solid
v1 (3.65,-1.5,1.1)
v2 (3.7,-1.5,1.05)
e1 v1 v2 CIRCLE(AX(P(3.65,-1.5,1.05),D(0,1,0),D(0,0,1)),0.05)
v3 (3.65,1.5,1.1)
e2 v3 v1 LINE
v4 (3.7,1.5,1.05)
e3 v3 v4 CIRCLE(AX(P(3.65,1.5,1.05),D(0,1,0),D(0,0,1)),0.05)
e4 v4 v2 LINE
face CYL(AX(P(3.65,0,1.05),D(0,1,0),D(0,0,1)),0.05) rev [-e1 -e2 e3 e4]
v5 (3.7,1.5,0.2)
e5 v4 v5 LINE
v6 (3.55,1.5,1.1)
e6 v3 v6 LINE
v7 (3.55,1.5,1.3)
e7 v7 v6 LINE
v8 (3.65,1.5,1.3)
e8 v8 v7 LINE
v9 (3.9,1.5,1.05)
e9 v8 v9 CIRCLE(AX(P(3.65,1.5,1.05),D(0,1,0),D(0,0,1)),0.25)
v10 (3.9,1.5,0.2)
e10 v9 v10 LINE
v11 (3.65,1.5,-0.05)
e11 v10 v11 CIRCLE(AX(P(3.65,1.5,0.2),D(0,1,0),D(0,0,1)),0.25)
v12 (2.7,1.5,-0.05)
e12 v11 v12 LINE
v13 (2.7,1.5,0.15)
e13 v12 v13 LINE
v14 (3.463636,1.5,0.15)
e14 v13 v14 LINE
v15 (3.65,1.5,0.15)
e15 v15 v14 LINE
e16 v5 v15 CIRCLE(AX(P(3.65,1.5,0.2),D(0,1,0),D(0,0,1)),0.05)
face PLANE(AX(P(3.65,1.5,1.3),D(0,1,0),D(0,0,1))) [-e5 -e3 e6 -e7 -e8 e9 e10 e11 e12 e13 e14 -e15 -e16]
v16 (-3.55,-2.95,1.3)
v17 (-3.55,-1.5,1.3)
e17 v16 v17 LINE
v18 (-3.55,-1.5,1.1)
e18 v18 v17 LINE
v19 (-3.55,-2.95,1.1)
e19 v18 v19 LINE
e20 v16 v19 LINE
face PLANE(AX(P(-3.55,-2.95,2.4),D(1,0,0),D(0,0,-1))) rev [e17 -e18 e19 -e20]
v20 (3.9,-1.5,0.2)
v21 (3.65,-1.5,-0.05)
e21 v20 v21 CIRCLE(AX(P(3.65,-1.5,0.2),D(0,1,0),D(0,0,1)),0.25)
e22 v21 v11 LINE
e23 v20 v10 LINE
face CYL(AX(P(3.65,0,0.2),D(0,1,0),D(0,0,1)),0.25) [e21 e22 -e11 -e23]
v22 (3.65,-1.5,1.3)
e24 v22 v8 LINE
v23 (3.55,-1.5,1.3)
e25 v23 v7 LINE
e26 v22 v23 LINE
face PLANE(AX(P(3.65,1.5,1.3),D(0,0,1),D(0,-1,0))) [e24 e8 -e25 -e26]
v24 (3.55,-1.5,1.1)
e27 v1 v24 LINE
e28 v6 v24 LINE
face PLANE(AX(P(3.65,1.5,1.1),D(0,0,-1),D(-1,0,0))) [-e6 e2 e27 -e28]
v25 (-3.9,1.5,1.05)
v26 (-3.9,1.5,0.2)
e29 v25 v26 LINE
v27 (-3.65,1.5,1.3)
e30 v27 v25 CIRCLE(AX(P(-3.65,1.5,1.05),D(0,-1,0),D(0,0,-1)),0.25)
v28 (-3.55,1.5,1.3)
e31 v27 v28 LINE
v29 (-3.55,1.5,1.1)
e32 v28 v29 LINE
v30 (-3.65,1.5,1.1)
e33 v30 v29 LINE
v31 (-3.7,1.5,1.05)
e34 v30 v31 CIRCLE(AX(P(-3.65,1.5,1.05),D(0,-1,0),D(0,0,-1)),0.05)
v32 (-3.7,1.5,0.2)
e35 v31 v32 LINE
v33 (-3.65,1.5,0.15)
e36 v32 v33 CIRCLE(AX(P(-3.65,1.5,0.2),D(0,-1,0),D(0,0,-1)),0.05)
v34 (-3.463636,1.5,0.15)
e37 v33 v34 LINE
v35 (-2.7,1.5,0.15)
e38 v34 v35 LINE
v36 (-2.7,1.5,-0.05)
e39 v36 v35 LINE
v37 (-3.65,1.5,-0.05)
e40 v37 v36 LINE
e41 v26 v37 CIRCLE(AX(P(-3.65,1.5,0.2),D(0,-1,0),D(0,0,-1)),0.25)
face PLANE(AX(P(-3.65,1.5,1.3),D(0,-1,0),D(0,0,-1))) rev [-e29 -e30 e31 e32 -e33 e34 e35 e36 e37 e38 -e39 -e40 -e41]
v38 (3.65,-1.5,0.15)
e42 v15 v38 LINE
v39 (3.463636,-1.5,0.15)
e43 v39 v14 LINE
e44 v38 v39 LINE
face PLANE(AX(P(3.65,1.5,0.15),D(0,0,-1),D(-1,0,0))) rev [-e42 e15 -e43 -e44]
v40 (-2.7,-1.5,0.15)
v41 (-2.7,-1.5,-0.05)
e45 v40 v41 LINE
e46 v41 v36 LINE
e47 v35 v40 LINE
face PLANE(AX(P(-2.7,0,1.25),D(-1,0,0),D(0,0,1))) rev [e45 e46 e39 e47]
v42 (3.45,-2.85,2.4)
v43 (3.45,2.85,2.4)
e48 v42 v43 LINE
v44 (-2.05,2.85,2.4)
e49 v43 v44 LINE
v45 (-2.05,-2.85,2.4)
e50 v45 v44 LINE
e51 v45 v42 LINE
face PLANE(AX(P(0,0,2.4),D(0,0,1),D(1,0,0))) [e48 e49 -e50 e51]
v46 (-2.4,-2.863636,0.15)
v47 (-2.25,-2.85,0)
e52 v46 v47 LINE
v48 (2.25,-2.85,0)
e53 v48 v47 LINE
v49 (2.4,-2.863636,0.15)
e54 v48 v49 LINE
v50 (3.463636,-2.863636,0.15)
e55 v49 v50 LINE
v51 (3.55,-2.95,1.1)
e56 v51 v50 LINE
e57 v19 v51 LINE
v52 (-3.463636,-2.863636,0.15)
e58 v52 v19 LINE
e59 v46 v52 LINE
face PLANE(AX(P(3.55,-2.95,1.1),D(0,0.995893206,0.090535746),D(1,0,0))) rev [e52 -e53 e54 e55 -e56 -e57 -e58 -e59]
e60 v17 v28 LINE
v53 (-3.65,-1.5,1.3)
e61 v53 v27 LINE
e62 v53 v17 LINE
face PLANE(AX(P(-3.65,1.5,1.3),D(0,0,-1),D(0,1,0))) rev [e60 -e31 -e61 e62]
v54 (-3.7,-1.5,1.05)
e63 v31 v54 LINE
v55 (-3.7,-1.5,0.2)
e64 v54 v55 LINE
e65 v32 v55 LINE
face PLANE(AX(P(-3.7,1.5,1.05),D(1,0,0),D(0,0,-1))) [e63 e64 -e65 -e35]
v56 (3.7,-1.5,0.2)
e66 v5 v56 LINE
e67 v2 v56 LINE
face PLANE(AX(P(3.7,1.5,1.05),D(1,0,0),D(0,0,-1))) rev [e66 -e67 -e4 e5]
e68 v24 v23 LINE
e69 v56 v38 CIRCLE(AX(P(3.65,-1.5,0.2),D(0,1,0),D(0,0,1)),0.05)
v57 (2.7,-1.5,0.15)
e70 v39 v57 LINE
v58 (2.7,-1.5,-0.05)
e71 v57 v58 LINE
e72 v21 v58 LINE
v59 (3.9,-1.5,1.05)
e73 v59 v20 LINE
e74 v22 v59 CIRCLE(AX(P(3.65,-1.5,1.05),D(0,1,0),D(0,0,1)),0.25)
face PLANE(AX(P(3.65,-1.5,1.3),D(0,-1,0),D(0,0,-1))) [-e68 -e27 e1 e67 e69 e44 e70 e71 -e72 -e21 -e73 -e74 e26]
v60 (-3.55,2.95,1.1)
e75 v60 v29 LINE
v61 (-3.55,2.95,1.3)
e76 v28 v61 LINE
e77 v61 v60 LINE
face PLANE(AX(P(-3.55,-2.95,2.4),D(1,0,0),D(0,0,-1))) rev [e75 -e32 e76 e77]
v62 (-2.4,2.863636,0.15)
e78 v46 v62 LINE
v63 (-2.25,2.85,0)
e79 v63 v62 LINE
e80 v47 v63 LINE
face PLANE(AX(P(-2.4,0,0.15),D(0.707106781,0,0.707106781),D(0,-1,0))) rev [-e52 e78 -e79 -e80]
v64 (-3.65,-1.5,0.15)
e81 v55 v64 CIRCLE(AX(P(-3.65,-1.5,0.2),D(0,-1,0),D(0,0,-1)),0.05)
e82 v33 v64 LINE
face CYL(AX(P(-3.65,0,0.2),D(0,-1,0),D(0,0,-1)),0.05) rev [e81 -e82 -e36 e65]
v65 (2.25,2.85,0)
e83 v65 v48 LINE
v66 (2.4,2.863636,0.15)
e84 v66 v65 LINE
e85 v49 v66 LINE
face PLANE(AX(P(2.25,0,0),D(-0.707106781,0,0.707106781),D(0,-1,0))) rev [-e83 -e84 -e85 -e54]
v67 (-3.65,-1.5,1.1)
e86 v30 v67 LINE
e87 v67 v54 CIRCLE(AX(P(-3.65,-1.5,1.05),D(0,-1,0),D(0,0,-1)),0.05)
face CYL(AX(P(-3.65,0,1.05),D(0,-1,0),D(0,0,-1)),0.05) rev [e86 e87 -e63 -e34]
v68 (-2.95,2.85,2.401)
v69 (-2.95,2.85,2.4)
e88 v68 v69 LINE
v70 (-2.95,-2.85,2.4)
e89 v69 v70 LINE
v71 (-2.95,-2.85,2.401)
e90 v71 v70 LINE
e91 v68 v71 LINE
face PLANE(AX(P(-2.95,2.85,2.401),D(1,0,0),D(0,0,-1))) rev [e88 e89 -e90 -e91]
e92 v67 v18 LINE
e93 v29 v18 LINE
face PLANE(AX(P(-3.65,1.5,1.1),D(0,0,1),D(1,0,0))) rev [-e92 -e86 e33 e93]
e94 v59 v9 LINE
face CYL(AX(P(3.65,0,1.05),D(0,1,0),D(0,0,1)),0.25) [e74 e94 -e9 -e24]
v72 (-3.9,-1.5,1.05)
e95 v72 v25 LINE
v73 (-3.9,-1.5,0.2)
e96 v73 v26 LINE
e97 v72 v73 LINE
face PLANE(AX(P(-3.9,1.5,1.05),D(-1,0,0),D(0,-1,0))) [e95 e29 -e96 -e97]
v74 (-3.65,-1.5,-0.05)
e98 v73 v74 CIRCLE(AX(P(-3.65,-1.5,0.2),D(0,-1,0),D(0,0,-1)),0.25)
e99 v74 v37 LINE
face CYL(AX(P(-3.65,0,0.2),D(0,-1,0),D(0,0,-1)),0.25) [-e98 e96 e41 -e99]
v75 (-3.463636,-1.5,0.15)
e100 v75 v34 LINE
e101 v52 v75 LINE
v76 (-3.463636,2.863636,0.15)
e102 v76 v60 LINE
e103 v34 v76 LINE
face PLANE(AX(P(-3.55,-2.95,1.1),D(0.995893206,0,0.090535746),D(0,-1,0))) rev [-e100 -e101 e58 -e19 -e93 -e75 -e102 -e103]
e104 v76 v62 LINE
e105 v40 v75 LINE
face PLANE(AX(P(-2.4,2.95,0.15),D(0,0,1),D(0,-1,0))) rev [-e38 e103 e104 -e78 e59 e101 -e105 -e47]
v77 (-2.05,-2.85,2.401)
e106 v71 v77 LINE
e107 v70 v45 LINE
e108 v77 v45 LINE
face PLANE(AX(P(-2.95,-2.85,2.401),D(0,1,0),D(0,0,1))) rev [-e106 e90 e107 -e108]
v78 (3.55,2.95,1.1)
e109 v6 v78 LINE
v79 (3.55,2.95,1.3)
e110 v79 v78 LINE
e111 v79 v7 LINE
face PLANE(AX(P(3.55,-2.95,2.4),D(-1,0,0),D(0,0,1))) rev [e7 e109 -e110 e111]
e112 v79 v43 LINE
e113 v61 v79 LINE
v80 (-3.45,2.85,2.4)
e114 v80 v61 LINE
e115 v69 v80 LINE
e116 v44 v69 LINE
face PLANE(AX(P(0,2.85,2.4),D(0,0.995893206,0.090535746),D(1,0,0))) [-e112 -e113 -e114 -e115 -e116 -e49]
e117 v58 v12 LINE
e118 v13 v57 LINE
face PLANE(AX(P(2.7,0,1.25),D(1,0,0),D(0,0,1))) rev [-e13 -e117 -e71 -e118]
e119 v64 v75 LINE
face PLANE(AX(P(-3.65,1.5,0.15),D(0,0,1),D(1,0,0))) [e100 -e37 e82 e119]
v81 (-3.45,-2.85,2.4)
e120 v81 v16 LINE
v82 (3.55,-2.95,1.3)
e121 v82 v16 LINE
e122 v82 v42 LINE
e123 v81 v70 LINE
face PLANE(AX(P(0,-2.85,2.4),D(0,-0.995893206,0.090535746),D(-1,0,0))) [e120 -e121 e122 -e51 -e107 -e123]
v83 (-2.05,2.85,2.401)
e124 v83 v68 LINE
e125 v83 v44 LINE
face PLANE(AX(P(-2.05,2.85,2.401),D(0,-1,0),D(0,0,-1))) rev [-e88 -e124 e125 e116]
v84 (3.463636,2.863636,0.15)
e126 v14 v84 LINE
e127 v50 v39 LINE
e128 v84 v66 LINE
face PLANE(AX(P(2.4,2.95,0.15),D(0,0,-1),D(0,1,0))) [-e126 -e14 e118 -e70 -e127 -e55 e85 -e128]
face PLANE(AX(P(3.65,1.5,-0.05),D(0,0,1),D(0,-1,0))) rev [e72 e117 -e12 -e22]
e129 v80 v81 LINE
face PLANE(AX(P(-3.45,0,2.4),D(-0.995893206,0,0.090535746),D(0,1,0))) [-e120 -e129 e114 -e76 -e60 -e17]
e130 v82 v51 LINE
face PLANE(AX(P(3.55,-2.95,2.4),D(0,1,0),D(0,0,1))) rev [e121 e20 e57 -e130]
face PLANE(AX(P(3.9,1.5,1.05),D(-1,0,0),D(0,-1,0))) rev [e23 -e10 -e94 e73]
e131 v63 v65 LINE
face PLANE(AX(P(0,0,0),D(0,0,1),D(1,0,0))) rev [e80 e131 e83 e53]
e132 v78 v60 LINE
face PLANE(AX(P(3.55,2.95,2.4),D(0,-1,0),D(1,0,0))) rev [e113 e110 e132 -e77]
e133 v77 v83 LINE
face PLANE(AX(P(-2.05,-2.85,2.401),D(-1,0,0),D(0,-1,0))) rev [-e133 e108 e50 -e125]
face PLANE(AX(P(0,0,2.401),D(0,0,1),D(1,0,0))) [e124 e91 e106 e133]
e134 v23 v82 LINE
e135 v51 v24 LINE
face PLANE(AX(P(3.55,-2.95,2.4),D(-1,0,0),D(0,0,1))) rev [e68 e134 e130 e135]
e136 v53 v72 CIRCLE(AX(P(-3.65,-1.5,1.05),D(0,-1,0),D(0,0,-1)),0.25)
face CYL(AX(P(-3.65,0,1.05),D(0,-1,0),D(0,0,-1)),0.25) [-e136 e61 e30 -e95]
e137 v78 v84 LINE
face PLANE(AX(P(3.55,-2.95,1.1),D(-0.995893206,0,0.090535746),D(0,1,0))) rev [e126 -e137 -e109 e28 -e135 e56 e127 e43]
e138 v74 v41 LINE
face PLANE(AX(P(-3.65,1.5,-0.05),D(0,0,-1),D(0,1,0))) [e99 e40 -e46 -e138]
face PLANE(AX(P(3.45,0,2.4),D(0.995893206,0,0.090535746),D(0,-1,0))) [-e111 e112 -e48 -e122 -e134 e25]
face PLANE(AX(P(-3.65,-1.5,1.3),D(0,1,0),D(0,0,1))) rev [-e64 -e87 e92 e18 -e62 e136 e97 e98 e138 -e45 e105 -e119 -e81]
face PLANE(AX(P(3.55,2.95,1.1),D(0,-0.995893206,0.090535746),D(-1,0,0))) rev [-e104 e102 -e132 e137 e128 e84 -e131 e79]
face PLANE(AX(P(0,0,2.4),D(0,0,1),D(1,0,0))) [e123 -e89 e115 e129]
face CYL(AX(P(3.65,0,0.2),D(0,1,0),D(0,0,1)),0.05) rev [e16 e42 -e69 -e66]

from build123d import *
from OCP.BRepFilletAPI import BRepFilletAPI_MakeChamfer

# Parameters (mm, degrees)
SZKIC1_W                    = 7.1
SZKIC1_H                    = 5.9
DODANIE_WYCI_GNI_CIE1_DEPTH = 2.4
SFAZOWANIE1_SIZE            = 1.1
SFAZOWANIE1_SIZE2           = 0.1
SFAZOWANIE2_SIZE            = 0.1
SFAZOWANIE2_SIZE2           = 1.1
SZKIC2_W                    = 0.9
SZKIC2_H                    = 5.7
DODANIE_WYCI_GNI_CIE2_DEPTH = 0.001
SZKIC3_W                    = 0.15
SZKIC3_H                    = 5.9
WYTNIJ_WYCI_GNI_CIE1_DEPTH  = 1.15
SFAZOWANIE3_SIZE            = 0.15
SZKIC4_W                    = 0.2
SZKIC4_H                    = 3
SFAZOWANIE3_OF_LUSTRO1_SIZE = 0.15


with BuildPart() as part:
    # Szkic1 → Dodanie-wyciągnięcie1 (new body)
    with BuildSketch(Plane.XY):
        Rectangle(SZKIC1_W, SZKIC1_H)
    extrude(amount=DODANIE_WYCI_GNI_CIE1_DEPTH)

    # Sfazowanie1: one chamfer whose edges measure the first distance from different faces: ONE call of the kernel's chamfer builder (chamfer() names one face for all edges)
    sfazowanie1_edges_1 = [part.edges().sort_by_distance(p)[0] for p in [
        (3.55, 0, 2.4),
    ]]
    sfazowanie1_side_1 = [part.faces().sort_by_distance(p)[0] for p in [
        (3.55, 0, 1.2),
    ]]
    sfazowanie1_edges_2 = [part.edges().sort_by_distance(p)[0] for p in [
        (0, 2.95, 2.4),
    ]]
    sfazowanie1_side_2 = [part.faces().sort_by_distance(p)[0] for p in [
        (0, 2.95, 1.2),
    ]]
    sfazowanie1_edges_3 = [part.edges().sort_by_distance(p)[0] for p in [
        (-3.55, 0, 2.4),
    ]]
    sfazowanie1_side_3 = [part.faces().sort_by_distance(p)[0] for p in [
        (-3.55, 0, 1.2),
    ]]
    sfazowanie1_edges_4 = [part.edges().sort_by_distance(p)[0] for p in [
        (0, -2.95, 2.4),
    ]]
    sfazowanie1_side_4 = [part.faces().sort_by_distance(p)[0] for p in [
        (0, -2.95, 1.2),
    ]]
    sfazowanie1 = BRepFilletAPI_MakeChamfer(part.part.solid().wrapped)
    for e in sfazowanie1_edges_1:
        sfazowanie1.Add(SFAZOWANIE1_SIZE, SFAZOWANIE1_SIZE2, e.wrapped, sfazowanie1_side_1[0].wrapped)  # the first distance lies on this face
    for e in sfazowanie1_edges_2:
        sfazowanie1.Add(SFAZOWANIE1_SIZE, SFAZOWANIE1_SIZE2, e.wrapped, sfazowanie1_side_2[0].wrapped)  # the first distance lies on this face
    for e in sfazowanie1_edges_3:
        sfazowanie1.Add(SFAZOWANIE1_SIZE, SFAZOWANIE1_SIZE2, e.wrapped, sfazowanie1_side_3[0].wrapped)  # the first distance lies on this face
    for e in sfazowanie1_edges_4:
        sfazowanie1.Add(SFAZOWANIE1_SIZE, SFAZOWANIE1_SIZE2, e.wrapped, sfazowanie1_side_4[0].wrapped)  # the first distance lies on this face
    add(Compound.cast(sfazowanie1.Shape()), mode=Mode.REPLACE)

    # Sfazowanie2
    sfazowanie2_edges = [part.edges().sort_by_distance(p)[0] for p in [
        (0, 2.95, 0),
        (3.55, 0, 0),
        (0, -2.95, 0),
        (-3.55, 0, 0),
    ]]
    sfazowanie2_side = [part.faces().sort_by_distance(p)[0] for p in [
        (0, 0, 0),
    ]]
    chamfer(sfazowanie2_edges, length=SFAZOWANIE2_SIZE, length2=SFAZOWANIE2_SIZE2, reference=sfazowanie2_side[0])

    # Szkic2 → Dodanie-wyciągnięcie2 (add)
    with BuildSketch(Plane.XY.offset(2.4)):
        with Locations((-2.5, 0)):
            Rectangle(SZKIC2_W, SZKIC2_H)
    extrude(amount=DODANIE_WYCI_GNI_CIE2_DEPTH)

    # Szkic3 → Wytnij-wyciągnięcie1 (cut)
    with BuildSketch(Plane.ZY.offset(3.55)):
        with Locations((0.075, 0)):
            Rectangle(SZKIC3_W, SZKIC3_H)
    wytnij_wyci_gni_cie1 = extrude(amount=-WYTNIJ_WYCI_GNI_CIE1_DEPTH, mode=Mode.SUBTRACT)

    # Sfazowanie3
    sfazowanie3_edges = [part.edges().sort_by_distance(p)[0] for p in [
        (-2.4, 0, 0),
    ]]
    chamfer(sfazowanie3_edges, length=SFAZOWANIE3_SIZE - 0.0001)  # a hair under: the kernel refuses the full size

    # Wyciągnięcie po ścieżce1: sweep along a path in Szkic5
    with BuildLine(Plane(origin=(0, 0, 0), x_dir=(1, 0, 0), z_dir=(0, 1, 0))) as wyci_gni_cie_po_cie_ce1_path:
        Line((-3.55, -1.3), (-3.65, -1.3))
        ThreePointArc((-3.65, -1.3), (-3.826776695, -1.226776695), (-3.9, -1.05))
        Line((-3.9, -1.05), (-3.9, -0.2))
        ThreePointArc((-3.9, -0.2), (-3.826776695, -0.023223305), (-3.65, 0.05))
        Line((-3.65, 0.05), (-2.7, 0.05))
    # Szkic4 → Wyciągnięcie po ścieżce1 (sweep)
    with BuildSketch(Plane.ZY.offset(3.55)):
        with Locations((1.2, 0)):
            Rectangle(SZKIC4_W, SZKIC4_H)
    wyci_gni_cie_po_cie_ce1 = sweep(path=wyci_gni_cie_po_cie_ce1_path.line)

    # Lustro1: Wytnij-wyciągnięcie1, Wyciągnięcie po ścieżce1 across plane
    add(wytnij_wyci_gni_cie1.mirror(Plane(origin=(0, 0, 0), x_dir=(0, 0, 1), z_dir=(1, 0, 0))), mode=Mode.SUBTRACT)
    add(wyci_gni_cie_po_cie_ce1.mirror(Plane(origin=(0, 0, 0), x_dir=(0, 0, 1), z_dir=(1, 0, 0))))

    # Sfazowanie3 of Lustro1
    sfazowanie3_of_lustro1_edges = [part.edges().sort_by_distance(p)[0] for p in [
        (2.4, 0, 0),
    ]]
    chamfer(sfazowanie3_of_lustro1_edges, length=SFAZOWANIE3_OF_LUSTRO1_SIZE - 0.0001)  # a hair under: the kernel refuses the full size


solid = part.part
